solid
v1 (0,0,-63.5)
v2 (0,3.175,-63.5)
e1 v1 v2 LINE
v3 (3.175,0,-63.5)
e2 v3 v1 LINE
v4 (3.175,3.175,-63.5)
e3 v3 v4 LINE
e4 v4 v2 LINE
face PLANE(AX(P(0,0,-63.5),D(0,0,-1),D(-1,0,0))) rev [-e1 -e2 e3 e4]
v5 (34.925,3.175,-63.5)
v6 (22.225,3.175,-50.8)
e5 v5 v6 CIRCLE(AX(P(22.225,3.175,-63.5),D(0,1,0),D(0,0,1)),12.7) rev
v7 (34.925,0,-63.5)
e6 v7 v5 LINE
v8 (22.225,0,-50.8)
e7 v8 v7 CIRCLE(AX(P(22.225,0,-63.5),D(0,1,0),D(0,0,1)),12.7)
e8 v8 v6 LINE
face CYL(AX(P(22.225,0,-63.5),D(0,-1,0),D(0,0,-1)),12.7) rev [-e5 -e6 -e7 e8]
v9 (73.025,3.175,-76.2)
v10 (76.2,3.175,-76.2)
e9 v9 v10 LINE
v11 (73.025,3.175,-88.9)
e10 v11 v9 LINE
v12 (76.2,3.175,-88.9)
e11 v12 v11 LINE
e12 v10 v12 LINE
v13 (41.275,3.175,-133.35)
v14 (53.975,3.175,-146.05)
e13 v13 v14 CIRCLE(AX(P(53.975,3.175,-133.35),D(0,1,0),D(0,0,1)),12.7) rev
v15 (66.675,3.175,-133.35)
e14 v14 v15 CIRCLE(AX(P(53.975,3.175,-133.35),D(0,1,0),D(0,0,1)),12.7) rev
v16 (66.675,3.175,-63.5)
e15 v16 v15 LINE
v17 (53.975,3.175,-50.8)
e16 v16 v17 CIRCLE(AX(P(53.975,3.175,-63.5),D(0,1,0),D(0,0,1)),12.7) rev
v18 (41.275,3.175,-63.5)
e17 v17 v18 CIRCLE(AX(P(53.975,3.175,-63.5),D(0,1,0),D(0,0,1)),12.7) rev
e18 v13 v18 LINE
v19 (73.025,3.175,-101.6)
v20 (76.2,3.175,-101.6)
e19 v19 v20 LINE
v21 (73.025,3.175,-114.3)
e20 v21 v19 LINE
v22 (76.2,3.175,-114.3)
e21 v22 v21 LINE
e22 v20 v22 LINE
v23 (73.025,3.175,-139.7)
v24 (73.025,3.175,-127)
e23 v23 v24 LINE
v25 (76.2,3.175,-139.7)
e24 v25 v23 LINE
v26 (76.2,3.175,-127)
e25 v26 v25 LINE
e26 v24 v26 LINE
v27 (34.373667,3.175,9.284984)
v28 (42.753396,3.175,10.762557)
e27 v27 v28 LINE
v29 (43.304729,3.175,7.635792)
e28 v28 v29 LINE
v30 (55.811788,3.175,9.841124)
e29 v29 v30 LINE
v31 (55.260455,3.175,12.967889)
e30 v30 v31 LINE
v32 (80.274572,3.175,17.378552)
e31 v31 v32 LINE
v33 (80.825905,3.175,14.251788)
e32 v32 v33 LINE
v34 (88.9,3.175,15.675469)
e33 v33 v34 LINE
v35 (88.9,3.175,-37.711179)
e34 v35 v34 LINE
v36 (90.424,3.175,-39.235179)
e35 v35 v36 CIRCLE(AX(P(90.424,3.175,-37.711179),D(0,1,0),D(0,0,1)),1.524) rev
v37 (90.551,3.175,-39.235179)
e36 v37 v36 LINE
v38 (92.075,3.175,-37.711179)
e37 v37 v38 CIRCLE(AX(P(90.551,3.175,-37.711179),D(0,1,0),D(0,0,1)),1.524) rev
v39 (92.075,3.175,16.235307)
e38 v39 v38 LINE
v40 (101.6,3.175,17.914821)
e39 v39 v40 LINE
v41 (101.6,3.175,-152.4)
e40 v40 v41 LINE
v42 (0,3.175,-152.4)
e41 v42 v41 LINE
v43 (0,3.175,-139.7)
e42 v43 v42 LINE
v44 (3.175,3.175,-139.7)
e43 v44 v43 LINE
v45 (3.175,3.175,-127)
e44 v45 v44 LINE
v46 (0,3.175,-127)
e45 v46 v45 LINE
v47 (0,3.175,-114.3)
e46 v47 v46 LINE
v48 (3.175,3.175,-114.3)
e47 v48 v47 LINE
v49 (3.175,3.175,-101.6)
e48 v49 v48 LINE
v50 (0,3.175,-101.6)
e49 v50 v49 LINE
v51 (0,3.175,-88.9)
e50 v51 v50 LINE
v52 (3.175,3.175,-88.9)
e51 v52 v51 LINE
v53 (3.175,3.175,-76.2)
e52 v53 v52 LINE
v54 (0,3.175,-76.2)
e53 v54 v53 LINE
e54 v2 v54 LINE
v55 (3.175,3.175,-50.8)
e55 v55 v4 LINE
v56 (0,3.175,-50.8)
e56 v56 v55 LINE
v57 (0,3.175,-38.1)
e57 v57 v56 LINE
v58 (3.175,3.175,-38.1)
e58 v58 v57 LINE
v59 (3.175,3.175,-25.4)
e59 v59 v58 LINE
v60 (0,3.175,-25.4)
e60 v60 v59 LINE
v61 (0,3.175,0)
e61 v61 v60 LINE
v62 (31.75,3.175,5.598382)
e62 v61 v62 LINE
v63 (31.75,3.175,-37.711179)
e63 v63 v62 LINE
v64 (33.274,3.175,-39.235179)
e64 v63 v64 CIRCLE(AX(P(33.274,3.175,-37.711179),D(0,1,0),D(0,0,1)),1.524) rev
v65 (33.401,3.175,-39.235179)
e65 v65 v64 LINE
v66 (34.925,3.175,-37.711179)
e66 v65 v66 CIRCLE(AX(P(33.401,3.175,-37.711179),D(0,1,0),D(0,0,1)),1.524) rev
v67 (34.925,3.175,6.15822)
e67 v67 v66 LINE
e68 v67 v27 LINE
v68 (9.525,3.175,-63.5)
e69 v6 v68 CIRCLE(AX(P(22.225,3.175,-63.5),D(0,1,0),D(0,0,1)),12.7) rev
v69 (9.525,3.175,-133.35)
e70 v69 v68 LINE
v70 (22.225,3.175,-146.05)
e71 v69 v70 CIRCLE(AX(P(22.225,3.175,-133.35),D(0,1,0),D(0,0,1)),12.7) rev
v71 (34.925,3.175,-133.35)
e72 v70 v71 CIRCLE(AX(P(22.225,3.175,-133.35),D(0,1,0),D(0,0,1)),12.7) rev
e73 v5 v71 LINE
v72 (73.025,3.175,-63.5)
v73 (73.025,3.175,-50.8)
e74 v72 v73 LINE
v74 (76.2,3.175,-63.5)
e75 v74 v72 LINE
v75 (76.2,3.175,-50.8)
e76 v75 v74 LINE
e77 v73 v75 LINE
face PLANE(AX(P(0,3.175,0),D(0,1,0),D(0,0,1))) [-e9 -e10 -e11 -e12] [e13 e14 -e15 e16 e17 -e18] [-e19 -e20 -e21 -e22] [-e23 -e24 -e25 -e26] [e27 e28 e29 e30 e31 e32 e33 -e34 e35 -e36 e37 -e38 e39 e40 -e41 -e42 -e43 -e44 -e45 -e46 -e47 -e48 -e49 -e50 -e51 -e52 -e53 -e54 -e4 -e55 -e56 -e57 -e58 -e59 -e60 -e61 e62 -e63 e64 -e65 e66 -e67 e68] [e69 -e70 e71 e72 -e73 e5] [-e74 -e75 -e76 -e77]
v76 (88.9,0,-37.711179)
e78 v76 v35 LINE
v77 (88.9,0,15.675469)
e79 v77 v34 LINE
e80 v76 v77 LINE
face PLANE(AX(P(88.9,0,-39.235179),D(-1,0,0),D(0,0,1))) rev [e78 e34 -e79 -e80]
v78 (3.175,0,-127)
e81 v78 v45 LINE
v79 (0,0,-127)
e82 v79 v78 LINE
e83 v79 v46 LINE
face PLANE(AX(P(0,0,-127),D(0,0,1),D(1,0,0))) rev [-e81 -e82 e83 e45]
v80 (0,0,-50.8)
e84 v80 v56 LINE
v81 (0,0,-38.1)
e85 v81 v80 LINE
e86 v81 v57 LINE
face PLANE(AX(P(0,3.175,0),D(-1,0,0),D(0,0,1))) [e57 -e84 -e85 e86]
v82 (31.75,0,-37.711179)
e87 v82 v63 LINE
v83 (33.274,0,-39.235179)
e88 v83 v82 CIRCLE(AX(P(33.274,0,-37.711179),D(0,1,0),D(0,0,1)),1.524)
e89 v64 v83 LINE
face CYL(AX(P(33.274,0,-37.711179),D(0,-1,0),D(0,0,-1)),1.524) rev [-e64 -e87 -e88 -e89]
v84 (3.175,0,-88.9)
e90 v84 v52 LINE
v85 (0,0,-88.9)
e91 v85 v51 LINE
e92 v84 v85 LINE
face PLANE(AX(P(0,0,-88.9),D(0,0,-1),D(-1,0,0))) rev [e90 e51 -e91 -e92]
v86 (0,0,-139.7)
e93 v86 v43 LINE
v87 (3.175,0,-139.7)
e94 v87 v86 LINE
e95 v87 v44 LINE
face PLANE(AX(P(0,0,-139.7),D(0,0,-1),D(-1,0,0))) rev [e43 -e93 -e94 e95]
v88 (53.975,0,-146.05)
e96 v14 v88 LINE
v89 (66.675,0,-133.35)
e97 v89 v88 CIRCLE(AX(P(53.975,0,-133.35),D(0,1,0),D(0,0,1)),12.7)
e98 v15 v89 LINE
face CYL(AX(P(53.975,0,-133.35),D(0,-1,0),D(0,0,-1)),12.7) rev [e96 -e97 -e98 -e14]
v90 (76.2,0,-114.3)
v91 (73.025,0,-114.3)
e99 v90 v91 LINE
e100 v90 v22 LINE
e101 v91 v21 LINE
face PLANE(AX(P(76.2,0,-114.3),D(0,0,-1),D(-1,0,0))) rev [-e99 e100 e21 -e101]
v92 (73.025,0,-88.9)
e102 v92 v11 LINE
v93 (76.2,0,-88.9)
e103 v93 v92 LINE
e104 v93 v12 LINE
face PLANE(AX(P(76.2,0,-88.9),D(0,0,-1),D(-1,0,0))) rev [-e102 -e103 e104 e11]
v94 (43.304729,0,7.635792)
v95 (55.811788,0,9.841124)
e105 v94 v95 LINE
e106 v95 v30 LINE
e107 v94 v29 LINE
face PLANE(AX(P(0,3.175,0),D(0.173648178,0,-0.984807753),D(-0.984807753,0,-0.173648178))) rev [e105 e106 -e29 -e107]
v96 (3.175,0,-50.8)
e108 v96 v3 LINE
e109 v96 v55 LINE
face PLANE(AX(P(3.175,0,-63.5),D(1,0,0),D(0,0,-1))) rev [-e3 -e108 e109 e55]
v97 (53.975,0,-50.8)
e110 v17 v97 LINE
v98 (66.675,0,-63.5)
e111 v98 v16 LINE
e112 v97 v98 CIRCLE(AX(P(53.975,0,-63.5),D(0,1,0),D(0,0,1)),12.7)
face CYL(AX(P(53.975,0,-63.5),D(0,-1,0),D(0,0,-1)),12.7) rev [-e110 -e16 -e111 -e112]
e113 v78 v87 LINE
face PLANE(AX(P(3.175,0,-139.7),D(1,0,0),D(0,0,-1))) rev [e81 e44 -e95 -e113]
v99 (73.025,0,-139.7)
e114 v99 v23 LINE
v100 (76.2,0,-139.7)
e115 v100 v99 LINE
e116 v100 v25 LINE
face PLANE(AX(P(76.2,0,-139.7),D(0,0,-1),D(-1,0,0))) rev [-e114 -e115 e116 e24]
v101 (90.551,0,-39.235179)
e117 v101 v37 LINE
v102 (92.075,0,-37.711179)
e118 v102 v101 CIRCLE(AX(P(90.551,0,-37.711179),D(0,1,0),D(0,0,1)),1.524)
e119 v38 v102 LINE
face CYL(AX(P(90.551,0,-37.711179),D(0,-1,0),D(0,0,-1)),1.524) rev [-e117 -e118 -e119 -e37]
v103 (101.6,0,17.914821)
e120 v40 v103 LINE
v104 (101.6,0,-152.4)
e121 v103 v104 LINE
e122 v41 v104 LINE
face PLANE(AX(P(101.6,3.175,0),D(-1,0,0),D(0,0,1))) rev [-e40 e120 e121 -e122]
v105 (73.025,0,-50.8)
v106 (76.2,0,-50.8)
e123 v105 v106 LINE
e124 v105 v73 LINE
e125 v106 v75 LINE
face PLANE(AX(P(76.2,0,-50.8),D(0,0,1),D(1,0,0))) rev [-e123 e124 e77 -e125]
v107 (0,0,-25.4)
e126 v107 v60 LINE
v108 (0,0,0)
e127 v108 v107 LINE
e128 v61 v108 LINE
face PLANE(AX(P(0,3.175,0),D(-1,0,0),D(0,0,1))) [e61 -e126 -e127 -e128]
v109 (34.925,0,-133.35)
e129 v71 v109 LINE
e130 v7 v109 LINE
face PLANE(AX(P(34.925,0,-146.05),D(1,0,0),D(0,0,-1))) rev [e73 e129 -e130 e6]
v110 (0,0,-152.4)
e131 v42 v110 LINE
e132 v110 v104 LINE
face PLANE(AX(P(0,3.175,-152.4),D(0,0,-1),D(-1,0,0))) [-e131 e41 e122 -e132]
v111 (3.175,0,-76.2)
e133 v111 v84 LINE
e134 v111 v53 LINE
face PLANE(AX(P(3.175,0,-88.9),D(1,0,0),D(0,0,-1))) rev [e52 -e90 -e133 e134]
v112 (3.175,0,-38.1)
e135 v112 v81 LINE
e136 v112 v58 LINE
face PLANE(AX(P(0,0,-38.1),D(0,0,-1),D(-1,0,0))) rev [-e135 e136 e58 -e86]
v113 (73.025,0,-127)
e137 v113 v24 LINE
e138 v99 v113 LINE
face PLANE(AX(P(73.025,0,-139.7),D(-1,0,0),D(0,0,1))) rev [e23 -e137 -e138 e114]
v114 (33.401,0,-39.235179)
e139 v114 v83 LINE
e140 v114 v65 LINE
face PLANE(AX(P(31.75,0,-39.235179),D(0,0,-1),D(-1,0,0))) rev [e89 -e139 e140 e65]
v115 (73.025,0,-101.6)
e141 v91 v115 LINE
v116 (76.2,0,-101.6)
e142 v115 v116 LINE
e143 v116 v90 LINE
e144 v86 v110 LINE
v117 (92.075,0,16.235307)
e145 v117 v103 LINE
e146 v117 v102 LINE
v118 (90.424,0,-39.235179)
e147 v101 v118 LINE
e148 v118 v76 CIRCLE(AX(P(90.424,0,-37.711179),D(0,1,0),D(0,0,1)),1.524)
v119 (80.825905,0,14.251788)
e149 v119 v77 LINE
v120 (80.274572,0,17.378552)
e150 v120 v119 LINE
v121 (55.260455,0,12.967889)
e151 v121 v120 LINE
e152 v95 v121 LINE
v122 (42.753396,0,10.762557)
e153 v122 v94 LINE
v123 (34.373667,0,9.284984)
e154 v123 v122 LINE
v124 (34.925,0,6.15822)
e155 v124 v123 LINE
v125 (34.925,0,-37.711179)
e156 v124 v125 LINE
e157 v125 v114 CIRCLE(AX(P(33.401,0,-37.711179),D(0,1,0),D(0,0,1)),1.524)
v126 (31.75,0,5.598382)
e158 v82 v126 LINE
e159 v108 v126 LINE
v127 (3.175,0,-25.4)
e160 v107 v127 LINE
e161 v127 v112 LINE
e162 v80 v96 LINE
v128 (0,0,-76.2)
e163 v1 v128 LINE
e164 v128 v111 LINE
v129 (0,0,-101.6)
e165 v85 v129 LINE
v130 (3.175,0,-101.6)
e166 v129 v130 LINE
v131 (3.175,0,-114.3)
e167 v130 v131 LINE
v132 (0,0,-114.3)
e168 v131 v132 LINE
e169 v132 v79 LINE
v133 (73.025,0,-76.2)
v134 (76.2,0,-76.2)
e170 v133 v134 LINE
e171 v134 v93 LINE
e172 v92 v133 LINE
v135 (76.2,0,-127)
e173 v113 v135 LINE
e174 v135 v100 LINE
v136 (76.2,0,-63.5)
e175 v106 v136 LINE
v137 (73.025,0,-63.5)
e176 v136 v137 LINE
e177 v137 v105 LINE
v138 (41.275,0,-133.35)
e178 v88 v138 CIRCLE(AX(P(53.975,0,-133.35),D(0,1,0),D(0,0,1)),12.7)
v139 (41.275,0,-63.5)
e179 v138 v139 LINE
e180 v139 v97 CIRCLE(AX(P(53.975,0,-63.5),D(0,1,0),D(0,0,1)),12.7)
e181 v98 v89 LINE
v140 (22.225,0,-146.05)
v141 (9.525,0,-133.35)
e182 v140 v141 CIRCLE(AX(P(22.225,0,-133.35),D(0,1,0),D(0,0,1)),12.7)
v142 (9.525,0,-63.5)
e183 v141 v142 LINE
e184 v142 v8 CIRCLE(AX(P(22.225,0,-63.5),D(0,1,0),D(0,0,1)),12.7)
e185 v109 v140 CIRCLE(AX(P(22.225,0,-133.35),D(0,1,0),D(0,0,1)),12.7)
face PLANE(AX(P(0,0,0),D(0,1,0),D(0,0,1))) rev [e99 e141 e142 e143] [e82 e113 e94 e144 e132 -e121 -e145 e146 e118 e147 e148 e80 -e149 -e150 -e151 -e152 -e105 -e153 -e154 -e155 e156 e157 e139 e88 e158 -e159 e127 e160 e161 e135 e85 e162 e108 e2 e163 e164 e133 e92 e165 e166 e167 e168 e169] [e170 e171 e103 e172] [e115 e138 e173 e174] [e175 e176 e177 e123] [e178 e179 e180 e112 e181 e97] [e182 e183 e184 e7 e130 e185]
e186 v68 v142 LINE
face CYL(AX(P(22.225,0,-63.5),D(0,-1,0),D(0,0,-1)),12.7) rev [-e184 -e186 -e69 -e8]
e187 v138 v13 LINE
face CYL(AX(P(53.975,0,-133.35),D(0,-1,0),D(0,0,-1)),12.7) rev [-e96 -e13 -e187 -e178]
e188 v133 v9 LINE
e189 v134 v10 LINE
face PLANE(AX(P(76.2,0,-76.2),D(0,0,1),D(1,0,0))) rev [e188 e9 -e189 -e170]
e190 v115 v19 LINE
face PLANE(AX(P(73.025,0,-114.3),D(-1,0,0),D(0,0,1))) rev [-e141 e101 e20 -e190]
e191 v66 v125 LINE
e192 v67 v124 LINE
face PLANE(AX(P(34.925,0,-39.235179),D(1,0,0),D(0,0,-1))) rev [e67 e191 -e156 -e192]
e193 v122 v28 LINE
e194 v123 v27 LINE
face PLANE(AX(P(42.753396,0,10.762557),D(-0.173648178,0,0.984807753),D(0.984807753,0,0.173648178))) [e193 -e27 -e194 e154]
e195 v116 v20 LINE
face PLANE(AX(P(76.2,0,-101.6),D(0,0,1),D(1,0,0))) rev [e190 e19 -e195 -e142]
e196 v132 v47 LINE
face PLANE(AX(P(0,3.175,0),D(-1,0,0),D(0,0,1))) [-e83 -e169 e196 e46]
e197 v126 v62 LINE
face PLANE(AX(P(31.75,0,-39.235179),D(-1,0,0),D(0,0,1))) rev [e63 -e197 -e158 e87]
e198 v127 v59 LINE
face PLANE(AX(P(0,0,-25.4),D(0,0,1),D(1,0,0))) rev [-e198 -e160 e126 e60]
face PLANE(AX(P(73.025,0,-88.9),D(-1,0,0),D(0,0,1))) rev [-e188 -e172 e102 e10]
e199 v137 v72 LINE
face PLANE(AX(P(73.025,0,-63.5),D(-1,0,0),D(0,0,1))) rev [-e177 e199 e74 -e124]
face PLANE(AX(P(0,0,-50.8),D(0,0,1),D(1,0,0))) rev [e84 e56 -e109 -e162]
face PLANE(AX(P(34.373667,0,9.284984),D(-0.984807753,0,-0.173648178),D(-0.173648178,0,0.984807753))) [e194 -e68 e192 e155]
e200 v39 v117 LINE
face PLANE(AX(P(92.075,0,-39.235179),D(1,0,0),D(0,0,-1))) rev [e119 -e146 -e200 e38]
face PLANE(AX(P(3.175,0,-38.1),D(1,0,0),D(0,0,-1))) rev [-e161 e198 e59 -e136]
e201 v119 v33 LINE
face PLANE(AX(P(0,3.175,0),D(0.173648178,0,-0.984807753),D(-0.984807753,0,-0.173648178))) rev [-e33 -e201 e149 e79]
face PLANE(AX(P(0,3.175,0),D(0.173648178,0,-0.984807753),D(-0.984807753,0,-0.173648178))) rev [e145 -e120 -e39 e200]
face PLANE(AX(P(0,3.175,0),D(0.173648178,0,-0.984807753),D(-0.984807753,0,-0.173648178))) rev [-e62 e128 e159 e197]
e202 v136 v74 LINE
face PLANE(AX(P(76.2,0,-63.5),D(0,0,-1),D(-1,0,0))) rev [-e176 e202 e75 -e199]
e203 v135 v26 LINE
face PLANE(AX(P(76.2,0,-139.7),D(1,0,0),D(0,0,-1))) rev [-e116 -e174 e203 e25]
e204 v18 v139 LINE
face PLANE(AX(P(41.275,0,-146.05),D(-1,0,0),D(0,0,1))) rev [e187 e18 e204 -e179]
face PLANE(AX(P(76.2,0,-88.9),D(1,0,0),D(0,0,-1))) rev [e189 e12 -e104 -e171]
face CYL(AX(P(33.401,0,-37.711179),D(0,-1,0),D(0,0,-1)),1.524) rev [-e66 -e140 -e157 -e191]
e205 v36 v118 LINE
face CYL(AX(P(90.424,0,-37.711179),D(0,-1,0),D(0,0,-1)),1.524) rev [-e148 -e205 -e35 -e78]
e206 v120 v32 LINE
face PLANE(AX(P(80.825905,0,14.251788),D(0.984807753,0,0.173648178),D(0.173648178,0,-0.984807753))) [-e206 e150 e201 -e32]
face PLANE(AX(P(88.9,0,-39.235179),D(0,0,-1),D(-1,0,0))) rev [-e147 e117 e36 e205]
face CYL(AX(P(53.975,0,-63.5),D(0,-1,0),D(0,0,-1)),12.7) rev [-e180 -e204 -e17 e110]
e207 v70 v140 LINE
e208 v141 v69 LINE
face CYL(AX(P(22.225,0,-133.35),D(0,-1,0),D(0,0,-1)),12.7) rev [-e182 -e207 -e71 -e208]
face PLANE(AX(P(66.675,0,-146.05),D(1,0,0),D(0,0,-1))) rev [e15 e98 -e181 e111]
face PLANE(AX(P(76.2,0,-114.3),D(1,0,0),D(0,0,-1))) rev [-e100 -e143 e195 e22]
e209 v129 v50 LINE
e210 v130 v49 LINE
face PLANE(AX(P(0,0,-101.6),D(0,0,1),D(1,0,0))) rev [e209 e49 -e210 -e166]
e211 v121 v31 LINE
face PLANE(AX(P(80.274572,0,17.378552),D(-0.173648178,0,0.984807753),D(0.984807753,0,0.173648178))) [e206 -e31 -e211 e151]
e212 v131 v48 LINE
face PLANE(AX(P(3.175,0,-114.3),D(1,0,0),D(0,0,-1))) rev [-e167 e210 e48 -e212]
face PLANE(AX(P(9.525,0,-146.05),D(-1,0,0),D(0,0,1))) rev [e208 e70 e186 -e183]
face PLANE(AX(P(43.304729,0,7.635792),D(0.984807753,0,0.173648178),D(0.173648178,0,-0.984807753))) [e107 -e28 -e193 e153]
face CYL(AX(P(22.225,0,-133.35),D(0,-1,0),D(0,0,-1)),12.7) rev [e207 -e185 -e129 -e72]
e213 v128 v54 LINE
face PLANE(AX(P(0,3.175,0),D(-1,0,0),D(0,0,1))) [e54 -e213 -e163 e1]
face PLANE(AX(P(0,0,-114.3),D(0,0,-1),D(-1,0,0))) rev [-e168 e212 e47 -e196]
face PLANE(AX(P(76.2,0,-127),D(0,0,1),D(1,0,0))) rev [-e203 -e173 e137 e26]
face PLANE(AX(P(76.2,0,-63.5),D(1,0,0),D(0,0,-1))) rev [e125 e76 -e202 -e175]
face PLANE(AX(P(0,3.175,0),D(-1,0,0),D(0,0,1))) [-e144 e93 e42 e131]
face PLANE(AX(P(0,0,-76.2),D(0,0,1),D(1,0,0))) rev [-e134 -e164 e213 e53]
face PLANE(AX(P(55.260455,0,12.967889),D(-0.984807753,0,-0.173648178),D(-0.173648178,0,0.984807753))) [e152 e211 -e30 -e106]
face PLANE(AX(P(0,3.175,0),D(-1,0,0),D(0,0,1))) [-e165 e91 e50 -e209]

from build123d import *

# Parameters (mm, degrees)
SKETCH1_W           = 101.6
SKETCH1_H           = 152.4
BOSS_EXTRUDE1_DEPTH = 3.175
SKETCH2_W           = 3.175
SKETCH2_H           = 12.7
CUT_EXTRUDE1_DEPTH  = 3.175
LPATTERN1_COUNT     = 5
LPATTERN1_PITCH     = 25.4
SKETCH3_W           = 3.175
SKETCH3_H           = 12.7
CUT_EXTRUDE2_DEPTH  = 3.175
LPATTERN2_COUNT     = 4
LPATTERN2_PITCH     = 25.4
SKETCH5_W           = 3.175
SKETCH5_H           = 57.15
CUT_EXTRUDE3_DEPTH  = 3.175
FILLET1_R           = 1.524
BOSS_EXTRUDE2_DEPTH = 3.175
SKETCH7_W           = 25.4
SKETCH7_H           = 95.25
CUT_EXTRUDE4_DEPTH  = 3.175
FILLET2_R           = 12.7


with BuildPart() as part:
    # Sketch1 → Boss-Extrude1 (new body)
    with BuildSketch(Plane(origin=(0, 0, 0), x_dir=(1, 0, 0), z_dir=(0, 1, 0))):
        with Locations((50.8, 76.2)):
            Rectangle(SKETCH1_W, SKETCH1_H)
        Polygon((0, 0), (101.6, -17.91482124), (101.6, 0), align=None)
    extrude(amount=BOSS_EXTRUDE1_DEPTH)

    # Sketch2 → Cut-Extrude1 (cut)
    with BuildSketch(Plane(origin=(0, 3.175, 0), x_dir=(1, 0, 0), z_dir=(0, 1, 0))):
        with Locations((1.5875, 133.35)):
            Rectangle(SKETCH2_W, SKETCH2_H)
    cut_extrude1 = extrude(amount=-CUT_EXTRUDE1_DEPTH, mode=Mode.SUBTRACT)

    # LPattern1: Cut-Extrude1 ×5
    with Locations(*[(0, 0, i * LPATTERN1_PITCH) for i in range(1, LPATTERN1_COUNT)]):
        add(cut_extrude1, mode=Mode.SUBTRACT)

    # Sketch3 → Cut-Extrude2 (cut)
    with BuildSketch(Plane(origin=(0, 3.175, 0), x_dir=(1, 0, 0), z_dir=(0, 1, 0))):
        with Locations((74.6125, 133.35)):
            Rectangle(SKETCH3_W, SKETCH3_H)
    cut_extrude2 = extrude(amount=-CUT_EXTRUDE2_DEPTH, mode=Mode.SUBTRACT)

    # LPattern2: Cut-Extrude2 ×4
    with Locations(*[(0, 0, i * LPATTERN2_PITCH) for i in range(1, LPATTERN2_COUNT)]):
        add(cut_extrude2, mode=Mode.SUBTRACT)

    # Sketch5 → Cut-Extrude3 (cut)
    with BuildSketch(Plane(origin=(0, 3.175, 0), x_dir=(1, 0, 0), z_dir=(0, 1, 0))):
        with Locations((33.3375, 10.66017876)):
            Rectangle(SKETCH5_W, SKETCH5_H)
        with Locations((90.4875, 10.66017876)):
            Rectangle(SKETCH5_W, SKETCH5_H)
    extrude(amount=-CUT_EXTRUDE3_DEPTH, mode=Mode.SUBTRACT)

    # Fillet1
    fillet1_edges = [part.edges().sort_by_distance(p)[0] for p in [
        (34.925, 1.5875, -39.23517876),
        (31.75, 1.5875, -39.23517876),
        (92.075, 1.5875, -39.23517876),
        (88.9, 1.5875, -39.23517876),
    ]]
    fillet(fillet1_edges, radius=FILLET1_R)

    # Sketch6 → Boss-Extrude2 (add)
    with BuildSketch(Plane(origin=(0, 3.175, 0), x_dir=(1, 0, 0), z_dir=(0, 1, 0))):
        Polygon((34.925, -6.158219801), (43.30472917, -7.635792145), (42.753396206, -10.762556761), (34.373667036, -9.284984417), align=None)
        Polygon((55.811787634, -9.841124001), (80.82590456, -14.251787714), (80.274571596, -17.37855233), (55.26045467, -12.967888617), align=None)
    extrude(amount=-BOSS_EXTRUDE2_DEPTH)

    # Sketch7 → Cut-Extrude4 (cut)
    with BuildSketch(Plane(origin=(0, 3.175, 0), x_dir=(1, 0, 0), z_dir=(0, 1, 0))):
        with Locations((22.225, 98.425)):
            Rectangle(SKETCH7_W, SKETCH7_H)
        with Locations((53.975, 98.425)):
            Rectangle(SKETCH7_W, SKETCH7_H)
    extrude(amount=-CUT_EXTRUDE4_DEPTH, mode=Mode.SUBTRACT)

    # Fillet2
    fillet2_edges = [part.edges().sort_by_distance(p)[0] for p in [
        (66.675, 1.5875, -146.05),
        (34.925, 1.5875, -146.05),
        (41.275, 1.5875, -146.05),
        (9.525, 1.5875, -146.05),
        (34.925, 1.5875, -50.8),
        (41.275, 1.5875, -50.8),
        (66.675, 1.5875, -50.8),
        (9.525, 1.5875, -50.8),
    ]]
    fillet(fillet2_edges, radius=FILLET2_R - 0.0001)  # a hair under: the kernel refuses the full size


solid = part.part
